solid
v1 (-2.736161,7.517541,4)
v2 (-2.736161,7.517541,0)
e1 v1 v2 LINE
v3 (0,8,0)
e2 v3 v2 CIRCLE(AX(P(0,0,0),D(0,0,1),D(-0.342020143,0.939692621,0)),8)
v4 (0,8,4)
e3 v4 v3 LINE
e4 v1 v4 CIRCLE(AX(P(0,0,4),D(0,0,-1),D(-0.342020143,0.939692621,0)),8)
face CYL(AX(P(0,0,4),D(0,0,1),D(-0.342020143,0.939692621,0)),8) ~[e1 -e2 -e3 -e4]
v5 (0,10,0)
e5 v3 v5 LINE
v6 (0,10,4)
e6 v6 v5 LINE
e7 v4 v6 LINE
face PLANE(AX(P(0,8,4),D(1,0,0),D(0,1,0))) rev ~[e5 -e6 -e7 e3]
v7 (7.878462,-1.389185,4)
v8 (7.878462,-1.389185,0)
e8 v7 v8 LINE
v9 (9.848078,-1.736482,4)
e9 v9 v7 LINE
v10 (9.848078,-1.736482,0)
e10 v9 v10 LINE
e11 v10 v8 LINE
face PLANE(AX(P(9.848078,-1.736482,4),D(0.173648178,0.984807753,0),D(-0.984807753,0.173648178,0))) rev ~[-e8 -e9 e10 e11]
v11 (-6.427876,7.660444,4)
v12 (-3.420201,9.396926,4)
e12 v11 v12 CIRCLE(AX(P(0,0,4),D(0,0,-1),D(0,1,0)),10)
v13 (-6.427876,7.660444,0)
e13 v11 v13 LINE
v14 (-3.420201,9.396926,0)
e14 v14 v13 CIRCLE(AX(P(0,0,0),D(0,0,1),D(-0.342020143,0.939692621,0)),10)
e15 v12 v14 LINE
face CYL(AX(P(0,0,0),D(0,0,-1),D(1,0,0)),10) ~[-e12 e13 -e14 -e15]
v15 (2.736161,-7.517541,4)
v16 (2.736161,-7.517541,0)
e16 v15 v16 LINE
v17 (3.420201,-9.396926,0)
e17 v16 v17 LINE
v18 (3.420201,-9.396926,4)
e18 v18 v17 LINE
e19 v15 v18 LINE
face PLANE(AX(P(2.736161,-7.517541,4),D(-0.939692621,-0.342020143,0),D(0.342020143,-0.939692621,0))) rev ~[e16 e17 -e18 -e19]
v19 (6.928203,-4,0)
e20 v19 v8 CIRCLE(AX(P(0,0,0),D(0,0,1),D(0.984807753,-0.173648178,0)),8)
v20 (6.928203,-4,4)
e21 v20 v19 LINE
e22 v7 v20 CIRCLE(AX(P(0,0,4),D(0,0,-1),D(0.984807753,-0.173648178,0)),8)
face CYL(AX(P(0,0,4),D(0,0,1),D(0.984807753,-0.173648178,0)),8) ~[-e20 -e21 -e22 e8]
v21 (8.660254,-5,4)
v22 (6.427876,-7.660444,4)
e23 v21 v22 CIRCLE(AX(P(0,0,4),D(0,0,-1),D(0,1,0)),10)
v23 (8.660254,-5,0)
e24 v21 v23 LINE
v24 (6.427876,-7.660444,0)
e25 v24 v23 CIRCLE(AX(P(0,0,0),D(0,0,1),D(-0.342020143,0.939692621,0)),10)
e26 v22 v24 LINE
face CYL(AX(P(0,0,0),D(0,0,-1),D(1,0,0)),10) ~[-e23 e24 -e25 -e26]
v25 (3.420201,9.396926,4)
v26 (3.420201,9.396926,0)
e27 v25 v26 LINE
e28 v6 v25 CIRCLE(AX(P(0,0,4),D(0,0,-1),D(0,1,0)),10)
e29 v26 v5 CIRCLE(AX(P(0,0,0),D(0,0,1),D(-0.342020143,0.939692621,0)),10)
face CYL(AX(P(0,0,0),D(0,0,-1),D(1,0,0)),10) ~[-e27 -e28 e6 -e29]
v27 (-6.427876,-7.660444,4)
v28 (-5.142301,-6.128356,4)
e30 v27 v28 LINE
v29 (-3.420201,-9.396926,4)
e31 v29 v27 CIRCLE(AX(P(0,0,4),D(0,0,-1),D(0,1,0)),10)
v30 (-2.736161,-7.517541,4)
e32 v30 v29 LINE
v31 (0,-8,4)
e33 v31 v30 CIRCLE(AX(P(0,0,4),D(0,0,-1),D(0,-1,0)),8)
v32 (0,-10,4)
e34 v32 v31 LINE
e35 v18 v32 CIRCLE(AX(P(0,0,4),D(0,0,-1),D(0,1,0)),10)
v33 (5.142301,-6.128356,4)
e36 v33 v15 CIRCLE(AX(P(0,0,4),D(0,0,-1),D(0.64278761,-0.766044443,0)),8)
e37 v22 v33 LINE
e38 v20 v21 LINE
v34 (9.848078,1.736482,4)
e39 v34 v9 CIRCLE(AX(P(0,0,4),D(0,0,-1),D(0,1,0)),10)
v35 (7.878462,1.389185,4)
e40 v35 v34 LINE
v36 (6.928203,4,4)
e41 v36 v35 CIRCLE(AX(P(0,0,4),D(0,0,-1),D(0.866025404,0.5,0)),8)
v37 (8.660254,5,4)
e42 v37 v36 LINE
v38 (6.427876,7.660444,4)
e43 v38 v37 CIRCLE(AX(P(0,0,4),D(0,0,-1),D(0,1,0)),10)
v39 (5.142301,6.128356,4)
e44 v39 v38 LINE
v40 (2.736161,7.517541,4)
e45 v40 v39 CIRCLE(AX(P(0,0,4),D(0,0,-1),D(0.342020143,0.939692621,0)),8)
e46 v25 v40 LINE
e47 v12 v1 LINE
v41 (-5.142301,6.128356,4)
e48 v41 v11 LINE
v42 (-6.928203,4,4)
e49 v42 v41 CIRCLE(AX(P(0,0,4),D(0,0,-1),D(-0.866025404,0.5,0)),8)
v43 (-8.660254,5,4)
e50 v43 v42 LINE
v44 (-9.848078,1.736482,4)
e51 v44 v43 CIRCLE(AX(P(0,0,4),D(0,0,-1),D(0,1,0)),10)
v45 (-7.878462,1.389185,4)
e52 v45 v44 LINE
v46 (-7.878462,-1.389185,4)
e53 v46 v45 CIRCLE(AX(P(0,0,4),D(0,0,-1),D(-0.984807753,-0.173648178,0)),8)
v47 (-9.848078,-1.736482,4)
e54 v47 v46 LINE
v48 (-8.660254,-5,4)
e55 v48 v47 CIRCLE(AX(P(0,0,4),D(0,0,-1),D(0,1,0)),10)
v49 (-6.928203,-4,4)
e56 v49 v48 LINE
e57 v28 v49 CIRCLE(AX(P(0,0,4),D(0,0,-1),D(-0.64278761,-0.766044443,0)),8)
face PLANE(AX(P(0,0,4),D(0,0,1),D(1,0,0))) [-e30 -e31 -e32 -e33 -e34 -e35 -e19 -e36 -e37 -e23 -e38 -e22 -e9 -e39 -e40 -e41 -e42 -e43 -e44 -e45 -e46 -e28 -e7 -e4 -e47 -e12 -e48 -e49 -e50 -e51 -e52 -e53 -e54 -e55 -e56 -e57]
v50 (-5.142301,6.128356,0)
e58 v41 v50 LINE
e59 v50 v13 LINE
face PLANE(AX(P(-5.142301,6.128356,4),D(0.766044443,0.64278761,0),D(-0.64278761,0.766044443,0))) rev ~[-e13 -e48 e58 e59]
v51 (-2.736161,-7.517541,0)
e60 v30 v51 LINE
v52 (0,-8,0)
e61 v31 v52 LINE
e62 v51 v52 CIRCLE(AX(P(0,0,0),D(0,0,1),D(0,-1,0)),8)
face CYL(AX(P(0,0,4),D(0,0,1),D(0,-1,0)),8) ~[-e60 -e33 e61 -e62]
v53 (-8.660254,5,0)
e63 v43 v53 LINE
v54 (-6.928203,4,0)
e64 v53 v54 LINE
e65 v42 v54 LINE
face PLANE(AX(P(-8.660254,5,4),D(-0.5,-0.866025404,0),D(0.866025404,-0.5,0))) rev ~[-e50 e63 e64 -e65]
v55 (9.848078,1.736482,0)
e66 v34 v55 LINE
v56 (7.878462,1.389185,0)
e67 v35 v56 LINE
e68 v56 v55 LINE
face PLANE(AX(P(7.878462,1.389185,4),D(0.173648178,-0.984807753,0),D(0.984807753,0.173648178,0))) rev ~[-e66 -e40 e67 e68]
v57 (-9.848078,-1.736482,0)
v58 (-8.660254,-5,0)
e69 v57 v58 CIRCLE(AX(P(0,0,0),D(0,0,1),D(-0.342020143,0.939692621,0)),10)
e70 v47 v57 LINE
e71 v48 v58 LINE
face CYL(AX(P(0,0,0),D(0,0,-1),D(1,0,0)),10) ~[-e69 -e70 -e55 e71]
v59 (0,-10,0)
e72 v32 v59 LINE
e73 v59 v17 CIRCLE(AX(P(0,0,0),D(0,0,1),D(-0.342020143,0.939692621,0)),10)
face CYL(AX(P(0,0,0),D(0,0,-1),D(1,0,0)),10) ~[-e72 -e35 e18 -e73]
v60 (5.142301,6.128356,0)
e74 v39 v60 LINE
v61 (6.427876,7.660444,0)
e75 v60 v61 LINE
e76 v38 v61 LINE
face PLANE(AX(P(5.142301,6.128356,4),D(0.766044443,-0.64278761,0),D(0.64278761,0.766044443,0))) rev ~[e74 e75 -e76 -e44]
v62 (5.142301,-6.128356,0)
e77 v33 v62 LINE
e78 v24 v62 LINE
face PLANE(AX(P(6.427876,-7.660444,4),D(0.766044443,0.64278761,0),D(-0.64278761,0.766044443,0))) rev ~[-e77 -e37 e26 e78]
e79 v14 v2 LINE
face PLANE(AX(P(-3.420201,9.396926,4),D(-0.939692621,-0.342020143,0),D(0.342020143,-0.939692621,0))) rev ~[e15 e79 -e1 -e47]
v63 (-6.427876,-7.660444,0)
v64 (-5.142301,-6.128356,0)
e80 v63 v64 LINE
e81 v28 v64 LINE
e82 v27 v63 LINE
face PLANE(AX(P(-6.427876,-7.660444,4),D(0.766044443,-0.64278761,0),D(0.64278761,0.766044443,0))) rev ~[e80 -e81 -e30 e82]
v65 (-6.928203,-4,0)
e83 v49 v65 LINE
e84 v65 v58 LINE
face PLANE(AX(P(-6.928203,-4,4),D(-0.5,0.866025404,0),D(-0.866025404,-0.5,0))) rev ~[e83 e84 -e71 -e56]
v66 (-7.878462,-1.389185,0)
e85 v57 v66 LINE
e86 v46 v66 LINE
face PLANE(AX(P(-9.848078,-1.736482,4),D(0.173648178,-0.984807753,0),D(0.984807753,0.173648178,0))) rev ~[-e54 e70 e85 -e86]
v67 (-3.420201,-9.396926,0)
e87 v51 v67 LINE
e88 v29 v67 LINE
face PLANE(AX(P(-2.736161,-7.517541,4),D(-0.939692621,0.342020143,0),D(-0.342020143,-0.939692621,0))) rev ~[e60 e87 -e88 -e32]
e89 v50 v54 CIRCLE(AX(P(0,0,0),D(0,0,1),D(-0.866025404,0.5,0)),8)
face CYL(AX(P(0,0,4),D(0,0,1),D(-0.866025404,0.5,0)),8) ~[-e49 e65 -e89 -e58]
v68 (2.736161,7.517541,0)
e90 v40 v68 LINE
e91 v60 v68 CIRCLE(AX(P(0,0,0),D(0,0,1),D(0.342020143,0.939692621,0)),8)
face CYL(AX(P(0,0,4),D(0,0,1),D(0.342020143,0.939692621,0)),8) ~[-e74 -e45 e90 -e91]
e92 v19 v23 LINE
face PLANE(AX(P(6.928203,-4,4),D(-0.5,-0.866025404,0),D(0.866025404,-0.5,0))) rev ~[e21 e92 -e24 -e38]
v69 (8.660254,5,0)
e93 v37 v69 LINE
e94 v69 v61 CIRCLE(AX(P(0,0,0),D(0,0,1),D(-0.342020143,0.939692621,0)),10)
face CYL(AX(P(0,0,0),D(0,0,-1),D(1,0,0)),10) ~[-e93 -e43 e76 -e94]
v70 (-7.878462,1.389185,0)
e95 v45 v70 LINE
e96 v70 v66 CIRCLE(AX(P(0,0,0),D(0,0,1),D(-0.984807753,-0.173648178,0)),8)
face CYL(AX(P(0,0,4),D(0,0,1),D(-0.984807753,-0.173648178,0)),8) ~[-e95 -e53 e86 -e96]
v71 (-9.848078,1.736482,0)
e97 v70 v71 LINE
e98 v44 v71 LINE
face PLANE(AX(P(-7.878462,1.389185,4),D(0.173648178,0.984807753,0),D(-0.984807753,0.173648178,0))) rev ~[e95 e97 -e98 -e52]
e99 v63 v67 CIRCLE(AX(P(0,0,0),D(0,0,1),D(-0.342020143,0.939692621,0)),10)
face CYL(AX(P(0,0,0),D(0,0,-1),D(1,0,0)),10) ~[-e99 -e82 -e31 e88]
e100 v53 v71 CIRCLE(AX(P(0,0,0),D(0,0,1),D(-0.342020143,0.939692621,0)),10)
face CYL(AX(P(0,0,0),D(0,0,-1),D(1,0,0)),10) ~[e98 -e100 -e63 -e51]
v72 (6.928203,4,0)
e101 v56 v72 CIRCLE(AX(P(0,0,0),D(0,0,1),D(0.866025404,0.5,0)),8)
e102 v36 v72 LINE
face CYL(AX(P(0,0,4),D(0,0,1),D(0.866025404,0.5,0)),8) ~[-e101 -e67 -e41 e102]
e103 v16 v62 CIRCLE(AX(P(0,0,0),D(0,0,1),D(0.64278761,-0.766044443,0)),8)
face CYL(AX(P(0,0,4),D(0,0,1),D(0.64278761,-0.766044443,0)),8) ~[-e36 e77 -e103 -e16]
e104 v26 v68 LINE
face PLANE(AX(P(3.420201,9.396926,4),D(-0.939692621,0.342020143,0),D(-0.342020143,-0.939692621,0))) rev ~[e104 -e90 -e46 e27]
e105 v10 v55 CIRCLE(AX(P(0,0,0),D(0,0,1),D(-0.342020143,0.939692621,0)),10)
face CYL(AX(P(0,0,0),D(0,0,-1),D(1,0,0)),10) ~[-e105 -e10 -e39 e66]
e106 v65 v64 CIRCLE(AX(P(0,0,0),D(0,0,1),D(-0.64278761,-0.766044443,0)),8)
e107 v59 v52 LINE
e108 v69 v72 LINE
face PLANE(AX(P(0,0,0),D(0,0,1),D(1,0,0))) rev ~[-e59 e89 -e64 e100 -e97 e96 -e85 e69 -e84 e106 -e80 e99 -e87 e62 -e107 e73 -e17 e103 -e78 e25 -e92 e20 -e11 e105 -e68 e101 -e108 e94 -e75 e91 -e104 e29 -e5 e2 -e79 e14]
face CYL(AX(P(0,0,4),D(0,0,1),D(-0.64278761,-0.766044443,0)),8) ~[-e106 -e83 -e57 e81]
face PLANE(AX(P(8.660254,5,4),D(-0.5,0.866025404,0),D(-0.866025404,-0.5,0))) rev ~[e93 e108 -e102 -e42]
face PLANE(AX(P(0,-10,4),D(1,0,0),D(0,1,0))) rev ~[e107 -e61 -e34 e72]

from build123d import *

# Parameters (mm, degrees)
F0_R            = 10
F1_DEPTH        = 4
F3_DEPTH        = 4.001
F3_COPIES_COUNT = 9


# Not quite as in the source:
# - a pattern or mirror of a feature is missing from the dataset's text; its kind, count and spacing are read off the source's solid


with BuildPart() as f1:
    # F0 (on Top) → F1 (new body)
    with BuildSketch(Plane.XY):
        Circle(F0_R)
    extrude(amount=F1_DEPTH)

    # F2 (on face) → F3 (cut, through all)
    with BuildSketch(Plane.XY.offset(4)):
        with BuildLine():
            ThreePointArc((-2.7361611466, 7.5175409663), (-1.3891854213, 7.8784620241), (0, 8))
            Line((0, 8), (0, 10))
            ThreePointArc((0, 10), (-1.7364817767, 9.8480775301), (-3.4202014333, 9.3969262079))
            Line((-3.4202014333, 9.3969262079), (-2.7361611466, 7.5175409663))
        make_face()
    f3 = extrude(amount=-F3_DEPTH, mode=Mode.SUBTRACT)

    # F3_copies: F3 ×9 about axis
    f3_copies_axis = Axis((0, 0, 0), (0, 0, 1))
    for i in range(1, F3_COPIES_COUNT):
        add(f3.rotate(f3_copies_axis, i * 360 / F3_COPIES_COUNT), mode=Mode.SUBTRACT)


solid = f1.part
